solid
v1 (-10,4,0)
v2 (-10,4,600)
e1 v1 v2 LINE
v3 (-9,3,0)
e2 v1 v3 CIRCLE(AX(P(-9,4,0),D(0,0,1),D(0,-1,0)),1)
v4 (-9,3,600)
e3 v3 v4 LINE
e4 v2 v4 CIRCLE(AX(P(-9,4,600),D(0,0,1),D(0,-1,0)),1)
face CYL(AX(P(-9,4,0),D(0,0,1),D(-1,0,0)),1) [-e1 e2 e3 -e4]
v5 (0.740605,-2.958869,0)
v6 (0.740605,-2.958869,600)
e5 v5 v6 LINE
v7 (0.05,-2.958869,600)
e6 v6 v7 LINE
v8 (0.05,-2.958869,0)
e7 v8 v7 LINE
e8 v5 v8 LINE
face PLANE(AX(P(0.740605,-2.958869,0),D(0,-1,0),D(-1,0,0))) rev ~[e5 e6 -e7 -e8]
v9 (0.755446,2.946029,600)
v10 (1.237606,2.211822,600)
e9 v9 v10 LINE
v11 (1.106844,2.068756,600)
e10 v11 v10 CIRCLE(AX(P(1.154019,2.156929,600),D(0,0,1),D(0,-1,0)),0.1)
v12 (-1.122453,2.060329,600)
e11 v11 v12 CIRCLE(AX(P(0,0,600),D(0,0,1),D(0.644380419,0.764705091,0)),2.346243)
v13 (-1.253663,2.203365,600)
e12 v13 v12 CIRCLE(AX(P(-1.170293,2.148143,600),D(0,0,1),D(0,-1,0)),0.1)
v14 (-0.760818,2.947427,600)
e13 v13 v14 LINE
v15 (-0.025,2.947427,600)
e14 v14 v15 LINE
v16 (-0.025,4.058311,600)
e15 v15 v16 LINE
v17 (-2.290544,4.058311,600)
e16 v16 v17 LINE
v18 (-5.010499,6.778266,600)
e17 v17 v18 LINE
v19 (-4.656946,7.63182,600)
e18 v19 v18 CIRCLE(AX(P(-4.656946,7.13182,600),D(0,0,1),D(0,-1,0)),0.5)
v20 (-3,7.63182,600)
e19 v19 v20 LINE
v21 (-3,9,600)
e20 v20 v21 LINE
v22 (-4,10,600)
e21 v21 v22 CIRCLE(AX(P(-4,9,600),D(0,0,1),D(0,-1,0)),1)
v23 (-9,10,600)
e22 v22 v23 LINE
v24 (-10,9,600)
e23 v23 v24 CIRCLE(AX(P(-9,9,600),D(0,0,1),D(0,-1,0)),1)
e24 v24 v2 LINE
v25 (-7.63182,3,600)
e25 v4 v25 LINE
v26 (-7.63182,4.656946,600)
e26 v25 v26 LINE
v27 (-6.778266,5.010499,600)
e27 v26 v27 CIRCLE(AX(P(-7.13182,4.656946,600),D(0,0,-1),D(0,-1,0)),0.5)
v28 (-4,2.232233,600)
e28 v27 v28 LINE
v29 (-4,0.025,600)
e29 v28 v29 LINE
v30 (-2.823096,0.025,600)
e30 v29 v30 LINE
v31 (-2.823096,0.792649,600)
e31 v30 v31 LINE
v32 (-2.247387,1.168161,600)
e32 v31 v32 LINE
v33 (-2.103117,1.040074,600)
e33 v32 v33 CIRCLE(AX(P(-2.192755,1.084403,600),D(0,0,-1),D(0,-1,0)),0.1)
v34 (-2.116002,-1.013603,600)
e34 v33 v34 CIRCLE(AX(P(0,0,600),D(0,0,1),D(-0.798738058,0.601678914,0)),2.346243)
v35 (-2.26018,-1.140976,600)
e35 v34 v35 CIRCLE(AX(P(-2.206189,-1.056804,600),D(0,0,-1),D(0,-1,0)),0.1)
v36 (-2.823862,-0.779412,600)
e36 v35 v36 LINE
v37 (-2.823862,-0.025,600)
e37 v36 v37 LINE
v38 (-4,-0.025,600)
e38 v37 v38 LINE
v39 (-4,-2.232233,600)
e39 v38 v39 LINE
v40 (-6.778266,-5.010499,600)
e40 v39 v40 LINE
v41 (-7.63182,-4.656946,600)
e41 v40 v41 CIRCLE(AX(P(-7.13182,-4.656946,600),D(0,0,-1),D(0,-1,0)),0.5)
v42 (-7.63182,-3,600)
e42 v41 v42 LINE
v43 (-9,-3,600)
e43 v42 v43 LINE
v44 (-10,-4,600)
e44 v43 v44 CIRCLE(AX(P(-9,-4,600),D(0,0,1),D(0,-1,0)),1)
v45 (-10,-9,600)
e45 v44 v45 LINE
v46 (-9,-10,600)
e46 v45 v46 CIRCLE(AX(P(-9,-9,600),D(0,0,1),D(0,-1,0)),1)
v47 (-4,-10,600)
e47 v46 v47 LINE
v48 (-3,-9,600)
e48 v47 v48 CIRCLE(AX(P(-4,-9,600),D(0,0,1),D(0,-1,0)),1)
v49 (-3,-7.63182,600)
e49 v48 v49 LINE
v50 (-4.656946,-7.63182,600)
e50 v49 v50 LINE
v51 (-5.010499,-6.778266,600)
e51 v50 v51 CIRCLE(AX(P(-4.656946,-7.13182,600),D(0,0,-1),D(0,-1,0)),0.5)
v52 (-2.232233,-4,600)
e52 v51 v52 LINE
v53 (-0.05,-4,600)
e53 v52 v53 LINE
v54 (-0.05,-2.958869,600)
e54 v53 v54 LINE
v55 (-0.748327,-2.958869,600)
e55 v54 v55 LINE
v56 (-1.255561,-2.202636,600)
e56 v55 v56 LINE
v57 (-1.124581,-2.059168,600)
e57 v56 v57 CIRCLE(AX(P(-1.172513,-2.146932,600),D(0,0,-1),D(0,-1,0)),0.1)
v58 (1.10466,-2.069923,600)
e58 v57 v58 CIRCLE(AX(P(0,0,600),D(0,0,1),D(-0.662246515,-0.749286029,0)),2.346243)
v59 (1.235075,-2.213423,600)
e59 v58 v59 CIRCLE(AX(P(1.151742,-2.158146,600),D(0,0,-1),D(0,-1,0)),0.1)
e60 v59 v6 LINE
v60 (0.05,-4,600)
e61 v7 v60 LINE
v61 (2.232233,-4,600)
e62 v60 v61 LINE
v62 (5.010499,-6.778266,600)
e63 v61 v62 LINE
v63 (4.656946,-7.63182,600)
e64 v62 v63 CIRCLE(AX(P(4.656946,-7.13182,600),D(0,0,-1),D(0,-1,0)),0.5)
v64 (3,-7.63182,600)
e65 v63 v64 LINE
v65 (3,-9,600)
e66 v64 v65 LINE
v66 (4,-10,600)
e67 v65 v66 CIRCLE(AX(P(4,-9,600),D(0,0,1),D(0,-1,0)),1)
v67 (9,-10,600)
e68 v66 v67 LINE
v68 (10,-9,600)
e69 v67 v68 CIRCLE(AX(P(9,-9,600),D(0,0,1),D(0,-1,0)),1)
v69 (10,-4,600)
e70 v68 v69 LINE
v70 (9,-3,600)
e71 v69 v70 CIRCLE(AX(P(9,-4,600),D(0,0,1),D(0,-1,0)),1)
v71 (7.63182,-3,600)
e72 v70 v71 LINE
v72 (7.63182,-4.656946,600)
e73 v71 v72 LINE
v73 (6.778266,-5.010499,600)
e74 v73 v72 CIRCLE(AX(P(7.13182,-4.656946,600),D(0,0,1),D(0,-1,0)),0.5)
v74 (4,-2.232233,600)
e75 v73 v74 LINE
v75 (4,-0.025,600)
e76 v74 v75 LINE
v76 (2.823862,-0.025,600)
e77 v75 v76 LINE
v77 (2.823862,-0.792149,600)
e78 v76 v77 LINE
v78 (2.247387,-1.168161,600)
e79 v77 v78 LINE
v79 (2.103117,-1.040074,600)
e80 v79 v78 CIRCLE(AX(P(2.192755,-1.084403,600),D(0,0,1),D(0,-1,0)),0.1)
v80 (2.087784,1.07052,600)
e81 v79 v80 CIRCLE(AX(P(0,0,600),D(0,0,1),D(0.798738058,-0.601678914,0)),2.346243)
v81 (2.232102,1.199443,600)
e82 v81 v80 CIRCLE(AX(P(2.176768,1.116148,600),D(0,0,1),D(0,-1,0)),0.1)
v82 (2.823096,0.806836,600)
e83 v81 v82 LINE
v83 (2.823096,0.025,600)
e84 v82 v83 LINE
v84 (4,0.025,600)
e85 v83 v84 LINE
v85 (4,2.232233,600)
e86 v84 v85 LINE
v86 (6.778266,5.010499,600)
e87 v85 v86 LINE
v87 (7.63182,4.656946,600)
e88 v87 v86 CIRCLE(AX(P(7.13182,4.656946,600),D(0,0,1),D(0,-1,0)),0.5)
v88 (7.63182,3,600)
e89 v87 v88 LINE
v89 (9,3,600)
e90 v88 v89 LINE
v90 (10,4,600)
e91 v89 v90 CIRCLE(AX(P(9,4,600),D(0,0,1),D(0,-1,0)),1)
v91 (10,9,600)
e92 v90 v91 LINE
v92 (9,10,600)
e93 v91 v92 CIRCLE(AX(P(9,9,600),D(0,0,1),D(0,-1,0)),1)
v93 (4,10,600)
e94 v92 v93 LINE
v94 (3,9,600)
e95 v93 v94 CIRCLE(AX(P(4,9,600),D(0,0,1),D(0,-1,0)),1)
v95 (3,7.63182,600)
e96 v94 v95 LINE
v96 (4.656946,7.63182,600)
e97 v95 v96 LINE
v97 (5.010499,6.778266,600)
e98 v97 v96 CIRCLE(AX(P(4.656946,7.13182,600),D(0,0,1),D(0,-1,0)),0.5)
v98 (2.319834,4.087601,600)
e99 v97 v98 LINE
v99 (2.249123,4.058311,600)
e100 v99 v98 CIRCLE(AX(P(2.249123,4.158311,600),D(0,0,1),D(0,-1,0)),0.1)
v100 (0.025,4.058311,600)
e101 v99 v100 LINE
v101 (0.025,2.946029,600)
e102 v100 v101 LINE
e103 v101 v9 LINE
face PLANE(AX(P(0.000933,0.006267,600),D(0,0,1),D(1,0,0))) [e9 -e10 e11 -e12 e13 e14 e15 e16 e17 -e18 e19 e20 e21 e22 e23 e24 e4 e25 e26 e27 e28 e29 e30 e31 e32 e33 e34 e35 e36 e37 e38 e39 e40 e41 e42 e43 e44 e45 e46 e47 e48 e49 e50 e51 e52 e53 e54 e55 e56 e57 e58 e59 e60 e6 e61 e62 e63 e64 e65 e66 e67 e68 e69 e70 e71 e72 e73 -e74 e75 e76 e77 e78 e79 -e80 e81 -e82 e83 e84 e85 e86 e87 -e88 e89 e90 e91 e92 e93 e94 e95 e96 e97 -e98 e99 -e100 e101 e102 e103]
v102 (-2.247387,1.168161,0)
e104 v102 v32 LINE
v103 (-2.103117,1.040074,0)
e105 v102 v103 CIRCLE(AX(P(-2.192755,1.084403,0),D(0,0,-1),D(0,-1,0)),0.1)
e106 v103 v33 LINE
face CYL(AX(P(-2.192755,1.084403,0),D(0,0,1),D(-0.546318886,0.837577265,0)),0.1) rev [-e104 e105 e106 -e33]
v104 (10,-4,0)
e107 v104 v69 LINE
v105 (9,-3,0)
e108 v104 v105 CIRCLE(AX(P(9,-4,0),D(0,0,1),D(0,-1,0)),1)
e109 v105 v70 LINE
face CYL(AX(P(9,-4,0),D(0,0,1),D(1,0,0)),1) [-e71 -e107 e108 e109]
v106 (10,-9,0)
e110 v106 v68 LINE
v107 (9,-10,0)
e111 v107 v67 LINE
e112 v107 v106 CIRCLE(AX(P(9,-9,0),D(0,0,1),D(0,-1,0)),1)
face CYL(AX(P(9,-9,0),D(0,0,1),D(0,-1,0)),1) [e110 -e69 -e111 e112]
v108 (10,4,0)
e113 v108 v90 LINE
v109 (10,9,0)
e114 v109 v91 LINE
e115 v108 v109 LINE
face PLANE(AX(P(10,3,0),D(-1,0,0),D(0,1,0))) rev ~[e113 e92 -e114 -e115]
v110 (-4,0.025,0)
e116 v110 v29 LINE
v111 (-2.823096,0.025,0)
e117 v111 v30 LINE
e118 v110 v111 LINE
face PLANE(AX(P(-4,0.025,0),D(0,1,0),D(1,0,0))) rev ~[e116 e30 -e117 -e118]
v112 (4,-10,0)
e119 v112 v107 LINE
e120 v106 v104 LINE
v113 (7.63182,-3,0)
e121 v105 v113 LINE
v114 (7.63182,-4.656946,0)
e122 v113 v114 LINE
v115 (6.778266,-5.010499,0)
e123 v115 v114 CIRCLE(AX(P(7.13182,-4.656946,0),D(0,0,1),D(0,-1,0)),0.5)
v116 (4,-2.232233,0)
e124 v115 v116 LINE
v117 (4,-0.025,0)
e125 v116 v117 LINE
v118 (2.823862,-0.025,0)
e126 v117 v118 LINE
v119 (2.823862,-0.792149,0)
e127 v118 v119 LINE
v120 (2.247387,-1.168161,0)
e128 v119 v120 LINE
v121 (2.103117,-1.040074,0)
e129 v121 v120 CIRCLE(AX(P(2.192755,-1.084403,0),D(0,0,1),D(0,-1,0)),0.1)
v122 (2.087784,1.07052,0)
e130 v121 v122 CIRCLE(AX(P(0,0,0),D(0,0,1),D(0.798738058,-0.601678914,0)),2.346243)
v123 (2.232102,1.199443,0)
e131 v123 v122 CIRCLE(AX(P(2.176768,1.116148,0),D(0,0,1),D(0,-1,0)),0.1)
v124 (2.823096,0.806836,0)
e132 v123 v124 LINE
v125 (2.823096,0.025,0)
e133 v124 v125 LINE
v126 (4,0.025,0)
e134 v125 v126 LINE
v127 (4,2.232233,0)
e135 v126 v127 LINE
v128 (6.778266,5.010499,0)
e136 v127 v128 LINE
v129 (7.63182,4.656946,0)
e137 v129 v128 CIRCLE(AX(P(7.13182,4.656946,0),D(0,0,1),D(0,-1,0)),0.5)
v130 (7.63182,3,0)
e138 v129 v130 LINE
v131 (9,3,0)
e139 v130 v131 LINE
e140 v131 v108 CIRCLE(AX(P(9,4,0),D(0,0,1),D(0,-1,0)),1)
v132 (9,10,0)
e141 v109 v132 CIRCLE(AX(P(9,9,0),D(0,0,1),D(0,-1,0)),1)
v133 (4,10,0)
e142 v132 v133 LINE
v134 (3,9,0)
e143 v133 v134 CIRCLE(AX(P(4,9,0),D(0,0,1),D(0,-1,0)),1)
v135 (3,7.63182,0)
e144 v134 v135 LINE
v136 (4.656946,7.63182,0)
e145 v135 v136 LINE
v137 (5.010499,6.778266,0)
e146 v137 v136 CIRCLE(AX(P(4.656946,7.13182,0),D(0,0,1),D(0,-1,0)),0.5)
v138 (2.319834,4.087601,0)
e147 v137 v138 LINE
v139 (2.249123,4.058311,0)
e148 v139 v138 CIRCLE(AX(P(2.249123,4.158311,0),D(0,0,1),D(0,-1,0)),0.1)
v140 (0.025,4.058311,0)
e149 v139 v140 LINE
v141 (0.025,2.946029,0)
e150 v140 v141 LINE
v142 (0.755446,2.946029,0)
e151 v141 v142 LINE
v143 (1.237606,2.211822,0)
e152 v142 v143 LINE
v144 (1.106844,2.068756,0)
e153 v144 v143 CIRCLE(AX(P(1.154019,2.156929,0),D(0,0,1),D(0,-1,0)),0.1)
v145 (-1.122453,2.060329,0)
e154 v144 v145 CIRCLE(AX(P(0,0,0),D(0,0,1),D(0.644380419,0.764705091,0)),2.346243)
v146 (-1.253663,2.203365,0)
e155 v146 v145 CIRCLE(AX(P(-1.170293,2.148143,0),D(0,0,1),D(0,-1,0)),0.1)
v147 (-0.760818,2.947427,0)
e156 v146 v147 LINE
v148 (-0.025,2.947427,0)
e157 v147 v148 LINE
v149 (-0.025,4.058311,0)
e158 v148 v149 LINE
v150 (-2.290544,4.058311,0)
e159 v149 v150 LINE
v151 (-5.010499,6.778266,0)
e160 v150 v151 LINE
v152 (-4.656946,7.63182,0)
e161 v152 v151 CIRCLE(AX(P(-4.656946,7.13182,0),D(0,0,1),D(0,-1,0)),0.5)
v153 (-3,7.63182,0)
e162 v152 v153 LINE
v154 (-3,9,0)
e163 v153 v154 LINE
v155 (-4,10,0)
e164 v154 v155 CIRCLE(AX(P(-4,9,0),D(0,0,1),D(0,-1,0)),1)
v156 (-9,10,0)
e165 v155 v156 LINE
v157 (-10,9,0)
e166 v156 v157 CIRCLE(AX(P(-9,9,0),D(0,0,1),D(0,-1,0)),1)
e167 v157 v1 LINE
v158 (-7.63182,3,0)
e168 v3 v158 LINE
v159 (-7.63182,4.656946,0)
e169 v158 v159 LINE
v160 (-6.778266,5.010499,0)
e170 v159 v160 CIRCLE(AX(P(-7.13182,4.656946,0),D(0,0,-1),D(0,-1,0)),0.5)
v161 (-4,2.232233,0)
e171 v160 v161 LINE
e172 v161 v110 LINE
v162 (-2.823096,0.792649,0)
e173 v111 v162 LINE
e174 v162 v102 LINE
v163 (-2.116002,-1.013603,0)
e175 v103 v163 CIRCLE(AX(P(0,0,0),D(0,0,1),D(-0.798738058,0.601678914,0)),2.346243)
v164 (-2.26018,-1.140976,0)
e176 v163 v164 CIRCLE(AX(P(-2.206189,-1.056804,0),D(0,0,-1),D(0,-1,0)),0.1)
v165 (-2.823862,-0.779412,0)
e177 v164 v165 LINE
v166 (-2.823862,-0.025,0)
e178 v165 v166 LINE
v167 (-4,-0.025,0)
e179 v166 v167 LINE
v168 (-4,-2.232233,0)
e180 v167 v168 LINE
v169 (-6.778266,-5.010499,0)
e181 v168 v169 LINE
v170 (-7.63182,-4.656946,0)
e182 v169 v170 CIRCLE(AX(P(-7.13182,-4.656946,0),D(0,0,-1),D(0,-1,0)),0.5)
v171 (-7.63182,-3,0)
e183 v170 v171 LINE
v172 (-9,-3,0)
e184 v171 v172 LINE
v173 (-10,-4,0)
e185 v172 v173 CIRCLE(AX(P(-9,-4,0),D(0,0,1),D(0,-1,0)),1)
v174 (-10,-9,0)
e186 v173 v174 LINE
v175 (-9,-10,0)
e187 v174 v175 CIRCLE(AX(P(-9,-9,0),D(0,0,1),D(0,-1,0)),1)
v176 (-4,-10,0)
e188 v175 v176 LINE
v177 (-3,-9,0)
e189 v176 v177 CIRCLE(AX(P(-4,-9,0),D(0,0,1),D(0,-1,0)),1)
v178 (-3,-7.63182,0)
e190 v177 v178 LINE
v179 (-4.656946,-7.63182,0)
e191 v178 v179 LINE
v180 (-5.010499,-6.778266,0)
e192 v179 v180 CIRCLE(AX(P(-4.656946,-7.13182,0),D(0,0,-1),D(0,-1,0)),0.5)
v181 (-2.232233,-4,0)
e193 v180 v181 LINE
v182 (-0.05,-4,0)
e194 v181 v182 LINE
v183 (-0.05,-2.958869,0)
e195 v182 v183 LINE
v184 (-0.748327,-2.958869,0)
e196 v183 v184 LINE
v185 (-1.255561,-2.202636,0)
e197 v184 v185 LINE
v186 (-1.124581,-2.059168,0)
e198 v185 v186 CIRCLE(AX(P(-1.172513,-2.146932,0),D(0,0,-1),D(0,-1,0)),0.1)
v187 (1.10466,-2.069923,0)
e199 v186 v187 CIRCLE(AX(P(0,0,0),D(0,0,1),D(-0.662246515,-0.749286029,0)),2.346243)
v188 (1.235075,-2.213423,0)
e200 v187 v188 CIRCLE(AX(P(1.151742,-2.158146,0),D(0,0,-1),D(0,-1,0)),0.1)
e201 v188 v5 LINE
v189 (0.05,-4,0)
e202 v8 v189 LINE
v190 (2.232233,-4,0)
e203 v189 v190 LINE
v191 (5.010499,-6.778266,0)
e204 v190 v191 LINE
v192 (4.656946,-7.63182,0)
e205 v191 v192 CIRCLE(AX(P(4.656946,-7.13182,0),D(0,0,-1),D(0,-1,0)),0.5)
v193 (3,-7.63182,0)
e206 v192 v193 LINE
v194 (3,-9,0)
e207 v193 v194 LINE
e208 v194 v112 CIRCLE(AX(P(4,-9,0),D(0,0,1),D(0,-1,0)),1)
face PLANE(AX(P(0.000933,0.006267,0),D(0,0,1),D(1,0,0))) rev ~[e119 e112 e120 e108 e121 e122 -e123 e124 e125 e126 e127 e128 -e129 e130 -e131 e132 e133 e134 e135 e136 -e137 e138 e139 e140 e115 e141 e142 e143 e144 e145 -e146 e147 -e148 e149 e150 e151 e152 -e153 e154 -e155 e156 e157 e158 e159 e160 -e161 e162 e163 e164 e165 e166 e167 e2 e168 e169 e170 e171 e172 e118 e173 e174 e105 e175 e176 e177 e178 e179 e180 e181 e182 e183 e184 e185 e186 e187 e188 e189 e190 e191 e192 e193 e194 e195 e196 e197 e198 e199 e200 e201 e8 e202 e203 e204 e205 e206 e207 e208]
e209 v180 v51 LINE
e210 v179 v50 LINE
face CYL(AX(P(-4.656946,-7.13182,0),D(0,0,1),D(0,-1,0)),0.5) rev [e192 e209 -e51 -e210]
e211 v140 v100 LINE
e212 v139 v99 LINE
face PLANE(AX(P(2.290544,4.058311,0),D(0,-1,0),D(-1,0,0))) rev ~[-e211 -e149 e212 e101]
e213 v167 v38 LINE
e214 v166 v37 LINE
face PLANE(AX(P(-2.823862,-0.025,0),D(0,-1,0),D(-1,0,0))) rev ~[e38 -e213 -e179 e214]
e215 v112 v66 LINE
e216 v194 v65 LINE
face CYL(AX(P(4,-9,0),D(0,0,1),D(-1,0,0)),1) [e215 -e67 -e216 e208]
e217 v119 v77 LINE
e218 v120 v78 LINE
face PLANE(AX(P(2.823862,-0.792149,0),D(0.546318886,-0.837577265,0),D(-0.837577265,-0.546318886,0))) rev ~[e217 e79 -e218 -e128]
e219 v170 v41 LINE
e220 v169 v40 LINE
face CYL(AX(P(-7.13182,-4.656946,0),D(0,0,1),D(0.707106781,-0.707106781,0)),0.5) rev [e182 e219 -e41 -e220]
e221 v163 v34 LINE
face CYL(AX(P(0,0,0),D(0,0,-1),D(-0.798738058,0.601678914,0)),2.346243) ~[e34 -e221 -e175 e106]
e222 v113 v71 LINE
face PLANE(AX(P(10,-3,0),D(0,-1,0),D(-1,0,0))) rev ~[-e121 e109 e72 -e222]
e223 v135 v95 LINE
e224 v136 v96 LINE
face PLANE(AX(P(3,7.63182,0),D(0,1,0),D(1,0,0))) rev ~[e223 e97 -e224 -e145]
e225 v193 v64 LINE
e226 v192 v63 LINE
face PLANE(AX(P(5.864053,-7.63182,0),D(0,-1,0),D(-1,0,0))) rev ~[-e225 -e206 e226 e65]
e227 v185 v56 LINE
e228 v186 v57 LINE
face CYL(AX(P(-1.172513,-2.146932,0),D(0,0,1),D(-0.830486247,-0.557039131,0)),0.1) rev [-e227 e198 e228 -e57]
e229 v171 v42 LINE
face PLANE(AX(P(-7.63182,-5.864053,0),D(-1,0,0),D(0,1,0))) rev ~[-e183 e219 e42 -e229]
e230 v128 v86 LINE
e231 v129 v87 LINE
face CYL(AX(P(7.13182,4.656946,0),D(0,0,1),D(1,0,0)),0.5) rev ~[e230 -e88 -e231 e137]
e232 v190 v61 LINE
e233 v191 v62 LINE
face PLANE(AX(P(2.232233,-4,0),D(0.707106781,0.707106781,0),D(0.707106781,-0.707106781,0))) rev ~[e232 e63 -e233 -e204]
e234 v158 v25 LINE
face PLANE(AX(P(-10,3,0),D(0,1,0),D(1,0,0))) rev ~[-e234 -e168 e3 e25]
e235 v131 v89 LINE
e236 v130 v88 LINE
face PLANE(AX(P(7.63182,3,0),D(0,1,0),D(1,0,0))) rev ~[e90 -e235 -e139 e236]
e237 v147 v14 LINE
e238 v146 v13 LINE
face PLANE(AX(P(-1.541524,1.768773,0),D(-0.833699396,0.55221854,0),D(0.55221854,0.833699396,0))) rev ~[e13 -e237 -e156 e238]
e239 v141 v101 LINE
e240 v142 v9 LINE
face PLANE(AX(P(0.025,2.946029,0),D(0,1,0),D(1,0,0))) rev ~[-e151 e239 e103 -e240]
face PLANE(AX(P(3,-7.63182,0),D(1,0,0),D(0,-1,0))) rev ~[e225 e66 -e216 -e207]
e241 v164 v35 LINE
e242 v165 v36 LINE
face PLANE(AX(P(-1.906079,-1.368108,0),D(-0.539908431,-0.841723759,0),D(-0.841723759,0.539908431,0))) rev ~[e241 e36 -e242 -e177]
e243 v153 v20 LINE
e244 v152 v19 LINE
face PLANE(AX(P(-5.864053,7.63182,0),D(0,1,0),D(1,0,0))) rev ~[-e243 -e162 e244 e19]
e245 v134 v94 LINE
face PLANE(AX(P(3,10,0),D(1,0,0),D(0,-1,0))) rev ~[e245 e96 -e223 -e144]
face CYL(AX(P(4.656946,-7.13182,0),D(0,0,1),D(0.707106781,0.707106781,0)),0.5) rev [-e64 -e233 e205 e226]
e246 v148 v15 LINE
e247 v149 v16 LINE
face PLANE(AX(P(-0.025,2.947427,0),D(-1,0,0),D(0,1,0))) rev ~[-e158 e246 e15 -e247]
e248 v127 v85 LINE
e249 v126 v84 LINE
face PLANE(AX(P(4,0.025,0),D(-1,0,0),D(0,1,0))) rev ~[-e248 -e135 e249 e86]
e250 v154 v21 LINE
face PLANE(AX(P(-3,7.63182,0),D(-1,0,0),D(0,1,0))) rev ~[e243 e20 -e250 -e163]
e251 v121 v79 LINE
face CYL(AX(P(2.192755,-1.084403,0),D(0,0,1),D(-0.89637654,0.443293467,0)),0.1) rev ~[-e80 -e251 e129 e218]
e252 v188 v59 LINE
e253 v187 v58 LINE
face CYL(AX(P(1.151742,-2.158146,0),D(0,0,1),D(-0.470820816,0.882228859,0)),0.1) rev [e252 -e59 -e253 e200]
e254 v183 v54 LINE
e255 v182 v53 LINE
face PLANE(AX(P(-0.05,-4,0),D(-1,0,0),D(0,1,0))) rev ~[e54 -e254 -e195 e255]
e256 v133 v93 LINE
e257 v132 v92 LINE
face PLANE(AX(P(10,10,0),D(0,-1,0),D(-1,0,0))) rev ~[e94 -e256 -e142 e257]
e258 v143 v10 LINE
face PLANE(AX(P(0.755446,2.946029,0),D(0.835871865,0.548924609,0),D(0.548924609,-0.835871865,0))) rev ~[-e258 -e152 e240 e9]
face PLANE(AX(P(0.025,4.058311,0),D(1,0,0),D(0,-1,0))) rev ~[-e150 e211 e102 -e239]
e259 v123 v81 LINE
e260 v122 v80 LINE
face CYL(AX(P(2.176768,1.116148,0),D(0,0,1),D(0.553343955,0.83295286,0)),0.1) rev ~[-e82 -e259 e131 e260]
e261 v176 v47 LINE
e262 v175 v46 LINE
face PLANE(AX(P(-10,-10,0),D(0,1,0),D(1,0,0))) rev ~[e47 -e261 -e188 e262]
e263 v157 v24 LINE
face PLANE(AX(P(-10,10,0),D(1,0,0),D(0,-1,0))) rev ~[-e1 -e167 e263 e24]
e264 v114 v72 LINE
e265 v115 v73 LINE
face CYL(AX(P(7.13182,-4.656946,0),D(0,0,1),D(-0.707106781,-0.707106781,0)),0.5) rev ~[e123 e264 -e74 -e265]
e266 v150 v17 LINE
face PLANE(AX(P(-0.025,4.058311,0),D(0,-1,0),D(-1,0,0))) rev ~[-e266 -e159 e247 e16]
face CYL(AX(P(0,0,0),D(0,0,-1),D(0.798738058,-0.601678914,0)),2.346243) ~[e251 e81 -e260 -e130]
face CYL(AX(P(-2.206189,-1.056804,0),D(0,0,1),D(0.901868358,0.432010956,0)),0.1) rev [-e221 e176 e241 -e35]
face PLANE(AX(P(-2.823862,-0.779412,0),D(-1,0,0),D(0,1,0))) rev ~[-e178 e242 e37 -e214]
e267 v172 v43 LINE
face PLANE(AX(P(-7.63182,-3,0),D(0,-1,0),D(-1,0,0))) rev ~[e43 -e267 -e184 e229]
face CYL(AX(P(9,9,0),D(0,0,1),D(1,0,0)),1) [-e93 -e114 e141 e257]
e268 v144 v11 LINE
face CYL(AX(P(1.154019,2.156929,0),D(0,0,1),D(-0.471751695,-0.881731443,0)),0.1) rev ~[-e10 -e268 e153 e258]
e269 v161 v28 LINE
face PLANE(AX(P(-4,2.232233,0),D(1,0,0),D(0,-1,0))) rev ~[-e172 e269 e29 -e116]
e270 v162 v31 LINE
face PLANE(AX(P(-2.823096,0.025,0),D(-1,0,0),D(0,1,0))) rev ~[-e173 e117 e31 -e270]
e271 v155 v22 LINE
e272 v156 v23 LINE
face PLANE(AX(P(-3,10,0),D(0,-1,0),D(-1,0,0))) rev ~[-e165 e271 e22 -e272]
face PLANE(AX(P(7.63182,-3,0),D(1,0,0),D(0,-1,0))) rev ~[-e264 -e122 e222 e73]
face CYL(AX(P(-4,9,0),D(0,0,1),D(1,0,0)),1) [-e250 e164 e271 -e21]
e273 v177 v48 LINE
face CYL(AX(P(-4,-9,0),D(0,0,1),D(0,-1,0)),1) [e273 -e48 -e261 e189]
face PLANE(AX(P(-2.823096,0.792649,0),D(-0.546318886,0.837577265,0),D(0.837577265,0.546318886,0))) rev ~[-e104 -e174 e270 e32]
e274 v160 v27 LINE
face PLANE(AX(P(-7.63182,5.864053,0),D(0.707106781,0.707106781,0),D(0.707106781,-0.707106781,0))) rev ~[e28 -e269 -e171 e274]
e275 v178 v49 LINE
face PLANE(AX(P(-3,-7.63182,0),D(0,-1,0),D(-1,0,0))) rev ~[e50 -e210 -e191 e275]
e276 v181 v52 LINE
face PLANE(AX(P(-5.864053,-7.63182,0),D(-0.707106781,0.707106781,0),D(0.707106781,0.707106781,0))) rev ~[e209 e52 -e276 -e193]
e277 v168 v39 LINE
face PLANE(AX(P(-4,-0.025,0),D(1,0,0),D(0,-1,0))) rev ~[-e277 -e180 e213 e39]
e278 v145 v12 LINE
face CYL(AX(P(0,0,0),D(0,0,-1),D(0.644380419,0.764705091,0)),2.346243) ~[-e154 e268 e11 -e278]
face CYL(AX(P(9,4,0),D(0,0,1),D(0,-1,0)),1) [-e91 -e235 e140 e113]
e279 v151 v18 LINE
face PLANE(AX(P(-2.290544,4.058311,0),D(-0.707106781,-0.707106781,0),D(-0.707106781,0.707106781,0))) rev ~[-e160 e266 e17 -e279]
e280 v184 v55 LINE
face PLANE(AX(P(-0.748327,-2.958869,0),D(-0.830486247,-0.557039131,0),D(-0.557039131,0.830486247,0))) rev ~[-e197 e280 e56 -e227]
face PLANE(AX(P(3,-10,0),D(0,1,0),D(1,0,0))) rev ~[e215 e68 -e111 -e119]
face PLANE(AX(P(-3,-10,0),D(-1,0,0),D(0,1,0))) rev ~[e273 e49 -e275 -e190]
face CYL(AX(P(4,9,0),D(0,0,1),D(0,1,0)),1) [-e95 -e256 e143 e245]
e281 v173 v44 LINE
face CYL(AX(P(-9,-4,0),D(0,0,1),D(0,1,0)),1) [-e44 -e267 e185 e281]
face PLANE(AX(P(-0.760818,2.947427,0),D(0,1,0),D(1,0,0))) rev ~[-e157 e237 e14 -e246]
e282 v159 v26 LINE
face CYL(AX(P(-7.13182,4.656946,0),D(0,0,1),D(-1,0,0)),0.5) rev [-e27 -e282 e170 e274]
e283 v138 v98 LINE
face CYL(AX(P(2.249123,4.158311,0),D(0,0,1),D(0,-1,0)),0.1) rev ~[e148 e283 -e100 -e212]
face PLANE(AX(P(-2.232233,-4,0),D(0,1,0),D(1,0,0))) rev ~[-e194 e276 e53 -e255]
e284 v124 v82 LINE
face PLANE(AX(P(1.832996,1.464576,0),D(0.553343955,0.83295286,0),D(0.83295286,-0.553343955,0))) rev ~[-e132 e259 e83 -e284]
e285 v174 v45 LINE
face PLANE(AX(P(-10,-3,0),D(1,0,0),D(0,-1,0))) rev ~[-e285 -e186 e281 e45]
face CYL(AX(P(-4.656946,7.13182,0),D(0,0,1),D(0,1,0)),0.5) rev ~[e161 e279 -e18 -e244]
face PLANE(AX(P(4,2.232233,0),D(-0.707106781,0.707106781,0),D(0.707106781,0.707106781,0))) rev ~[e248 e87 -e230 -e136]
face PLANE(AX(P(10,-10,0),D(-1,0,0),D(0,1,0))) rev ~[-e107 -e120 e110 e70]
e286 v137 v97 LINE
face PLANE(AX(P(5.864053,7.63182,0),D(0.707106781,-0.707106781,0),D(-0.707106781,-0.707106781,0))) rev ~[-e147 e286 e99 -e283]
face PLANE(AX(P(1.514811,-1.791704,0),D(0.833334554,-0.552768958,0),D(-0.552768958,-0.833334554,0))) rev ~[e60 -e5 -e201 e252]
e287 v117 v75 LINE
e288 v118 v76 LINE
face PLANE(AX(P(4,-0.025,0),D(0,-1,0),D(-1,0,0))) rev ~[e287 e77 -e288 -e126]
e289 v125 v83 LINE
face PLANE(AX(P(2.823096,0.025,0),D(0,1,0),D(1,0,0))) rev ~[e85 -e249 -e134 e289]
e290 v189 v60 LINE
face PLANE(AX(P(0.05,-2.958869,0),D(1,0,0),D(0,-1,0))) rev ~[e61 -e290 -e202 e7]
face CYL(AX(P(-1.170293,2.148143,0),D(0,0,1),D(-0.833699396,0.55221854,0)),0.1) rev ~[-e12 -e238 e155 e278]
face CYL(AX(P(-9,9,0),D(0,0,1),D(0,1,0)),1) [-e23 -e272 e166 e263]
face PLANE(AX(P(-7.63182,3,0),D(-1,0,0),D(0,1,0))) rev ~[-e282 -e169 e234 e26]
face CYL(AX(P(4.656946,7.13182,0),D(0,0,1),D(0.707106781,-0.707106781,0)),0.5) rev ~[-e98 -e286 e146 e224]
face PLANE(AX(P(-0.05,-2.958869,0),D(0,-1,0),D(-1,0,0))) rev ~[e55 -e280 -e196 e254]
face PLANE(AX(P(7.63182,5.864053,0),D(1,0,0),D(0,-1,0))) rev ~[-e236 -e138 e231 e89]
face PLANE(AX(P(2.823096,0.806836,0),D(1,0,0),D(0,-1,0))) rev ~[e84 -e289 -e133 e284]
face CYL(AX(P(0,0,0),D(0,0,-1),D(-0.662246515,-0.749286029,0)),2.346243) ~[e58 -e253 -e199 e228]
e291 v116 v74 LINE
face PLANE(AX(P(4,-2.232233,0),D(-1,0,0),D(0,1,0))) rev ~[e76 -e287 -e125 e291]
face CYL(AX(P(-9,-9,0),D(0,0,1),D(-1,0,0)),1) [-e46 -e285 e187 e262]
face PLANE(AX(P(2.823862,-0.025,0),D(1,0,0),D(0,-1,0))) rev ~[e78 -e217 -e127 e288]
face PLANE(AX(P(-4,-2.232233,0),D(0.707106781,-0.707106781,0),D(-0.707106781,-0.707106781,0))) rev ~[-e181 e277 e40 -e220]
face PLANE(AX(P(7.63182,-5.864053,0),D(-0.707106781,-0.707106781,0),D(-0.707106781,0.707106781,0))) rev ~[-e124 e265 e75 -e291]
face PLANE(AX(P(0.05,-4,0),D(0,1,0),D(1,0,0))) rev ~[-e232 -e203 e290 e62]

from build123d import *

# Parameters (mm, degrees)
F1_DEPTH = 600
F2_R     = 1
F3_R     = 0.5
F4_R     = 0.1


with BuildPart() as f1:
    # F0 (on Top) → F1 (new body)
    with BuildSketch(Plane.XY):
        with BuildLine():
            Line((-0.025, 4.0583112277), (-2.2905442747, 4.0583112277))
            Line((-2.2905442747, 4.0583112277), (-5.8640526549, 7.6318196079))
            Line((-5.8640526549, 7.6318196079), (-3, 7.6318196079))
            Line((-3, 7.6318196079), (-3, 10))
            Line((-3, 10), (-10, 10))
            Line((-10, 10), (-10, 3))
            Line((-10, 3), (-7.6318196079, 3))
            Line((-7.6318196079, 3), (-7.6318196079, 5.8640526549))
            Line((-7.6318196079, 5.8640526549), (-4, 2.232233047))
            Line((-4, 2.232233047), (-4, 0.025))
            Line((-4, 0.025), (-2.8230957687, 0.025))
            Line((-2.8230957687, 0.025), (-2.8230957687, 0.7926485917))
            Line((-2.8230957687, 0.7926485917), (-1.8740334308, 1.411684829))
            ThreePointArc((-1.8740334308, 1.411684829), (-2.3460869309, 0.0270456781), (-1.906078865, -1.3681077138))
            Line((-1.906078865, -1.3681077138), (-2.8238623803, -0.7794121329))
            Line((-2.8238623803, -0.7794121329), (-2.8238623803, -0.025))
            Line((-2.8238623803, -0.025), (-4, -0.025))
            Line((-4, -0.025), (-4, -2.232233047))
            Line((-4, -2.232233047), (-7.6318196079, -5.8640526549))
            Line((-7.6318196079, -5.8640526549), (-7.6318196079, -3))
            Line((-7.6318196079, -3), (-10, -3))
            Line((-10, -3), (-10, -10))
            Line((-10, -10), (-3, -10))
            Line((-3, -10), (-3, -7.6318196079))
            Line((-3, -7.6318196079), (-5.8640526549, -7.6318196079))
            Line((-5.8640526549, -7.6318196079), (-2.232233047, -4))
            Line((-2.232233047, -4), (-0.05, -4))
            Line((-0.05, -4), (-0.05, -2.9588690959))
            Line((-0.05, -2.9588690959), (-0.7483266194, -2.9588690959))
            Line((-0.7483266194, -2.9588690959), (-1.5537911294, -1.7580069631))
            ThreePointArc((-1.5537911294, -1.7580069631), (-0.0257632285, -2.3461013645), (1.5148107083, -1.7917041816))
            Line((1.5148107083, -1.7917041816), (0.7406048023, -2.9588690959))
            Line((0.7406048023, -2.9588690959), (0.05, -2.9588690959))
            Line((0.05, -2.9588690959), (0.05, -4))
            Line((0.05, -4), (2.232233047, -4))
            Line((2.232233047, -4), (5.8640526549, -7.6318196079))
            Line((5.8640526549, -7.6318196079), (3, -7.6318196079))
            Line((3, -7.6318196079), (3, -10))
            Line((3, -10), (10, -10))
            Line((10, -10), (10, -3))
            Line((10, -3), (7.6318196079, -3))
            Line((7.6318196079, -3), (7.6318196079, -5.8640526549))
            Line((7.6318196079, -5.8640526549), (4, -2.232233047))
            Line((4, -2.232233047), (4, -0.025))
            Line((4, -0.025), (2.8238623803, -0.025))
            Line((2.8238623803, -0.025), (2.8238623803, -0.7921485609))
            Line((2.8238623803, -0.7921485609), (1.8740334308, -1.411684829))
            ThreePointArc((1.8740334308, -1.411684829), (2.3460040432, 0.0334721598), (1.8329957125, 1.4645757318))
            Line((1.8329957125, 1.4645757318), (2.8230957687, 0.8068363719))
            Line((2.8230957687, 0.8068363719), (2.8230957687, 0.025))
            Line((2.8230957687, 0.025), (4, 0.025))
            Line((4, 0.025), (4, 2.232233047))
            Line((4, 2.232233047), (7.6318196079, 5.8640526549))
            Line((7.6318196079, 5.8640526549), (7.6318196079, 3))
            Line((7.6318196079, 3), (10, 3))
            Line((10, 3), (10, 10))
            Line((10, 10), (3, 10))
            Line((3, 10), (3, 7.6318196079))
            Line((3, 7.6318196079), (5.8640526549, 7.6318196079))
            Line((5.8640526549, 7.6318196079), (2.2905442747, 4.0583112277))
            Line((2.2905442747, 4.0583112277), (0.025, 4.0583112277))
            Line((0.025, 4.0583112277), (0.025, 2.9460287187))
            Line((0.025, 2.9460287187), (0.7554459771, 2.9460287187))
            Line((0.7554459771, 2.9460287187), (1.5118729288, 1.7941838266))
            ThreePointArc((1.5118729288, 1.7941838266), (-0.0195250931, 2.3461615731), (-1.5415243666, 1.7687730164))
            Line((-1.5415243666, 1.7687730164), (-0.7608180556, 2.9474266339))
            Line((-0.7608180556, 2.9474266339), (-0.025, 2.9474266339))
            Line((-0.025, 2.9474266339), (-0.025, 4.0583112277))
        make_face()
    extrude(amount=F1_DEPTH)

    # F2
    f2_edges = [f1.edges().sort_by_distance(p)[0] for p in [
        (10, 10, 300),
        (10, -10, 300),
        (-10, -10, 300),
        (-3, -10, 300),
        (3, -10, 300),
        (-3, 10, 300),
        (-10, 3, 300),
        (10, 3, 300),
        (10, -3, 300),
        (-10, -3, 300),
        (-10, 10, 300),
        (3, 10, 300),
    ]]
    fillet(f2_edges, radius=F2_R)

    # F3
    f3_edges = [f1.edges().sort_by_distance(p)[0] for p in [
        (-7.63182, 5.864053, 300),
        (-5.864053, 7.63182, 300),
        (5.864053, 7.63182, 300),
        (7.63182, 5.864053, 300),
        (-7.63182, -5.864053, 300),
        (-5.864053, -7.63182, 300),
        (5.864053, -7.63182, 300),
        (7.63182, -5.864053, 300),
    ]]
    fillet(f3_edges, radius=F3_R)

    # F4
    f4_edges = [f1.edges().sort_by_distance(p)[0] for p in [
        (-1.874033, 1.411685, 300),
        (2.290544, 4.058311, 300),
        (4.656946, 7.63182, 300),
        (-1.541524, 1.768773, 300),
        (1.514811, -1.791704, 300),
        (1.874033, -1.411685, 300),
        (1.832996, 1.464576, 300),
        (1.511873, 1.794184, 300),
        (-1.906079, -1.368108, 300),
        (-1.553791, -1.758007, 300),
    ]]
    fillet(f4_edges, radius=F4_R)


solid = f1.part
